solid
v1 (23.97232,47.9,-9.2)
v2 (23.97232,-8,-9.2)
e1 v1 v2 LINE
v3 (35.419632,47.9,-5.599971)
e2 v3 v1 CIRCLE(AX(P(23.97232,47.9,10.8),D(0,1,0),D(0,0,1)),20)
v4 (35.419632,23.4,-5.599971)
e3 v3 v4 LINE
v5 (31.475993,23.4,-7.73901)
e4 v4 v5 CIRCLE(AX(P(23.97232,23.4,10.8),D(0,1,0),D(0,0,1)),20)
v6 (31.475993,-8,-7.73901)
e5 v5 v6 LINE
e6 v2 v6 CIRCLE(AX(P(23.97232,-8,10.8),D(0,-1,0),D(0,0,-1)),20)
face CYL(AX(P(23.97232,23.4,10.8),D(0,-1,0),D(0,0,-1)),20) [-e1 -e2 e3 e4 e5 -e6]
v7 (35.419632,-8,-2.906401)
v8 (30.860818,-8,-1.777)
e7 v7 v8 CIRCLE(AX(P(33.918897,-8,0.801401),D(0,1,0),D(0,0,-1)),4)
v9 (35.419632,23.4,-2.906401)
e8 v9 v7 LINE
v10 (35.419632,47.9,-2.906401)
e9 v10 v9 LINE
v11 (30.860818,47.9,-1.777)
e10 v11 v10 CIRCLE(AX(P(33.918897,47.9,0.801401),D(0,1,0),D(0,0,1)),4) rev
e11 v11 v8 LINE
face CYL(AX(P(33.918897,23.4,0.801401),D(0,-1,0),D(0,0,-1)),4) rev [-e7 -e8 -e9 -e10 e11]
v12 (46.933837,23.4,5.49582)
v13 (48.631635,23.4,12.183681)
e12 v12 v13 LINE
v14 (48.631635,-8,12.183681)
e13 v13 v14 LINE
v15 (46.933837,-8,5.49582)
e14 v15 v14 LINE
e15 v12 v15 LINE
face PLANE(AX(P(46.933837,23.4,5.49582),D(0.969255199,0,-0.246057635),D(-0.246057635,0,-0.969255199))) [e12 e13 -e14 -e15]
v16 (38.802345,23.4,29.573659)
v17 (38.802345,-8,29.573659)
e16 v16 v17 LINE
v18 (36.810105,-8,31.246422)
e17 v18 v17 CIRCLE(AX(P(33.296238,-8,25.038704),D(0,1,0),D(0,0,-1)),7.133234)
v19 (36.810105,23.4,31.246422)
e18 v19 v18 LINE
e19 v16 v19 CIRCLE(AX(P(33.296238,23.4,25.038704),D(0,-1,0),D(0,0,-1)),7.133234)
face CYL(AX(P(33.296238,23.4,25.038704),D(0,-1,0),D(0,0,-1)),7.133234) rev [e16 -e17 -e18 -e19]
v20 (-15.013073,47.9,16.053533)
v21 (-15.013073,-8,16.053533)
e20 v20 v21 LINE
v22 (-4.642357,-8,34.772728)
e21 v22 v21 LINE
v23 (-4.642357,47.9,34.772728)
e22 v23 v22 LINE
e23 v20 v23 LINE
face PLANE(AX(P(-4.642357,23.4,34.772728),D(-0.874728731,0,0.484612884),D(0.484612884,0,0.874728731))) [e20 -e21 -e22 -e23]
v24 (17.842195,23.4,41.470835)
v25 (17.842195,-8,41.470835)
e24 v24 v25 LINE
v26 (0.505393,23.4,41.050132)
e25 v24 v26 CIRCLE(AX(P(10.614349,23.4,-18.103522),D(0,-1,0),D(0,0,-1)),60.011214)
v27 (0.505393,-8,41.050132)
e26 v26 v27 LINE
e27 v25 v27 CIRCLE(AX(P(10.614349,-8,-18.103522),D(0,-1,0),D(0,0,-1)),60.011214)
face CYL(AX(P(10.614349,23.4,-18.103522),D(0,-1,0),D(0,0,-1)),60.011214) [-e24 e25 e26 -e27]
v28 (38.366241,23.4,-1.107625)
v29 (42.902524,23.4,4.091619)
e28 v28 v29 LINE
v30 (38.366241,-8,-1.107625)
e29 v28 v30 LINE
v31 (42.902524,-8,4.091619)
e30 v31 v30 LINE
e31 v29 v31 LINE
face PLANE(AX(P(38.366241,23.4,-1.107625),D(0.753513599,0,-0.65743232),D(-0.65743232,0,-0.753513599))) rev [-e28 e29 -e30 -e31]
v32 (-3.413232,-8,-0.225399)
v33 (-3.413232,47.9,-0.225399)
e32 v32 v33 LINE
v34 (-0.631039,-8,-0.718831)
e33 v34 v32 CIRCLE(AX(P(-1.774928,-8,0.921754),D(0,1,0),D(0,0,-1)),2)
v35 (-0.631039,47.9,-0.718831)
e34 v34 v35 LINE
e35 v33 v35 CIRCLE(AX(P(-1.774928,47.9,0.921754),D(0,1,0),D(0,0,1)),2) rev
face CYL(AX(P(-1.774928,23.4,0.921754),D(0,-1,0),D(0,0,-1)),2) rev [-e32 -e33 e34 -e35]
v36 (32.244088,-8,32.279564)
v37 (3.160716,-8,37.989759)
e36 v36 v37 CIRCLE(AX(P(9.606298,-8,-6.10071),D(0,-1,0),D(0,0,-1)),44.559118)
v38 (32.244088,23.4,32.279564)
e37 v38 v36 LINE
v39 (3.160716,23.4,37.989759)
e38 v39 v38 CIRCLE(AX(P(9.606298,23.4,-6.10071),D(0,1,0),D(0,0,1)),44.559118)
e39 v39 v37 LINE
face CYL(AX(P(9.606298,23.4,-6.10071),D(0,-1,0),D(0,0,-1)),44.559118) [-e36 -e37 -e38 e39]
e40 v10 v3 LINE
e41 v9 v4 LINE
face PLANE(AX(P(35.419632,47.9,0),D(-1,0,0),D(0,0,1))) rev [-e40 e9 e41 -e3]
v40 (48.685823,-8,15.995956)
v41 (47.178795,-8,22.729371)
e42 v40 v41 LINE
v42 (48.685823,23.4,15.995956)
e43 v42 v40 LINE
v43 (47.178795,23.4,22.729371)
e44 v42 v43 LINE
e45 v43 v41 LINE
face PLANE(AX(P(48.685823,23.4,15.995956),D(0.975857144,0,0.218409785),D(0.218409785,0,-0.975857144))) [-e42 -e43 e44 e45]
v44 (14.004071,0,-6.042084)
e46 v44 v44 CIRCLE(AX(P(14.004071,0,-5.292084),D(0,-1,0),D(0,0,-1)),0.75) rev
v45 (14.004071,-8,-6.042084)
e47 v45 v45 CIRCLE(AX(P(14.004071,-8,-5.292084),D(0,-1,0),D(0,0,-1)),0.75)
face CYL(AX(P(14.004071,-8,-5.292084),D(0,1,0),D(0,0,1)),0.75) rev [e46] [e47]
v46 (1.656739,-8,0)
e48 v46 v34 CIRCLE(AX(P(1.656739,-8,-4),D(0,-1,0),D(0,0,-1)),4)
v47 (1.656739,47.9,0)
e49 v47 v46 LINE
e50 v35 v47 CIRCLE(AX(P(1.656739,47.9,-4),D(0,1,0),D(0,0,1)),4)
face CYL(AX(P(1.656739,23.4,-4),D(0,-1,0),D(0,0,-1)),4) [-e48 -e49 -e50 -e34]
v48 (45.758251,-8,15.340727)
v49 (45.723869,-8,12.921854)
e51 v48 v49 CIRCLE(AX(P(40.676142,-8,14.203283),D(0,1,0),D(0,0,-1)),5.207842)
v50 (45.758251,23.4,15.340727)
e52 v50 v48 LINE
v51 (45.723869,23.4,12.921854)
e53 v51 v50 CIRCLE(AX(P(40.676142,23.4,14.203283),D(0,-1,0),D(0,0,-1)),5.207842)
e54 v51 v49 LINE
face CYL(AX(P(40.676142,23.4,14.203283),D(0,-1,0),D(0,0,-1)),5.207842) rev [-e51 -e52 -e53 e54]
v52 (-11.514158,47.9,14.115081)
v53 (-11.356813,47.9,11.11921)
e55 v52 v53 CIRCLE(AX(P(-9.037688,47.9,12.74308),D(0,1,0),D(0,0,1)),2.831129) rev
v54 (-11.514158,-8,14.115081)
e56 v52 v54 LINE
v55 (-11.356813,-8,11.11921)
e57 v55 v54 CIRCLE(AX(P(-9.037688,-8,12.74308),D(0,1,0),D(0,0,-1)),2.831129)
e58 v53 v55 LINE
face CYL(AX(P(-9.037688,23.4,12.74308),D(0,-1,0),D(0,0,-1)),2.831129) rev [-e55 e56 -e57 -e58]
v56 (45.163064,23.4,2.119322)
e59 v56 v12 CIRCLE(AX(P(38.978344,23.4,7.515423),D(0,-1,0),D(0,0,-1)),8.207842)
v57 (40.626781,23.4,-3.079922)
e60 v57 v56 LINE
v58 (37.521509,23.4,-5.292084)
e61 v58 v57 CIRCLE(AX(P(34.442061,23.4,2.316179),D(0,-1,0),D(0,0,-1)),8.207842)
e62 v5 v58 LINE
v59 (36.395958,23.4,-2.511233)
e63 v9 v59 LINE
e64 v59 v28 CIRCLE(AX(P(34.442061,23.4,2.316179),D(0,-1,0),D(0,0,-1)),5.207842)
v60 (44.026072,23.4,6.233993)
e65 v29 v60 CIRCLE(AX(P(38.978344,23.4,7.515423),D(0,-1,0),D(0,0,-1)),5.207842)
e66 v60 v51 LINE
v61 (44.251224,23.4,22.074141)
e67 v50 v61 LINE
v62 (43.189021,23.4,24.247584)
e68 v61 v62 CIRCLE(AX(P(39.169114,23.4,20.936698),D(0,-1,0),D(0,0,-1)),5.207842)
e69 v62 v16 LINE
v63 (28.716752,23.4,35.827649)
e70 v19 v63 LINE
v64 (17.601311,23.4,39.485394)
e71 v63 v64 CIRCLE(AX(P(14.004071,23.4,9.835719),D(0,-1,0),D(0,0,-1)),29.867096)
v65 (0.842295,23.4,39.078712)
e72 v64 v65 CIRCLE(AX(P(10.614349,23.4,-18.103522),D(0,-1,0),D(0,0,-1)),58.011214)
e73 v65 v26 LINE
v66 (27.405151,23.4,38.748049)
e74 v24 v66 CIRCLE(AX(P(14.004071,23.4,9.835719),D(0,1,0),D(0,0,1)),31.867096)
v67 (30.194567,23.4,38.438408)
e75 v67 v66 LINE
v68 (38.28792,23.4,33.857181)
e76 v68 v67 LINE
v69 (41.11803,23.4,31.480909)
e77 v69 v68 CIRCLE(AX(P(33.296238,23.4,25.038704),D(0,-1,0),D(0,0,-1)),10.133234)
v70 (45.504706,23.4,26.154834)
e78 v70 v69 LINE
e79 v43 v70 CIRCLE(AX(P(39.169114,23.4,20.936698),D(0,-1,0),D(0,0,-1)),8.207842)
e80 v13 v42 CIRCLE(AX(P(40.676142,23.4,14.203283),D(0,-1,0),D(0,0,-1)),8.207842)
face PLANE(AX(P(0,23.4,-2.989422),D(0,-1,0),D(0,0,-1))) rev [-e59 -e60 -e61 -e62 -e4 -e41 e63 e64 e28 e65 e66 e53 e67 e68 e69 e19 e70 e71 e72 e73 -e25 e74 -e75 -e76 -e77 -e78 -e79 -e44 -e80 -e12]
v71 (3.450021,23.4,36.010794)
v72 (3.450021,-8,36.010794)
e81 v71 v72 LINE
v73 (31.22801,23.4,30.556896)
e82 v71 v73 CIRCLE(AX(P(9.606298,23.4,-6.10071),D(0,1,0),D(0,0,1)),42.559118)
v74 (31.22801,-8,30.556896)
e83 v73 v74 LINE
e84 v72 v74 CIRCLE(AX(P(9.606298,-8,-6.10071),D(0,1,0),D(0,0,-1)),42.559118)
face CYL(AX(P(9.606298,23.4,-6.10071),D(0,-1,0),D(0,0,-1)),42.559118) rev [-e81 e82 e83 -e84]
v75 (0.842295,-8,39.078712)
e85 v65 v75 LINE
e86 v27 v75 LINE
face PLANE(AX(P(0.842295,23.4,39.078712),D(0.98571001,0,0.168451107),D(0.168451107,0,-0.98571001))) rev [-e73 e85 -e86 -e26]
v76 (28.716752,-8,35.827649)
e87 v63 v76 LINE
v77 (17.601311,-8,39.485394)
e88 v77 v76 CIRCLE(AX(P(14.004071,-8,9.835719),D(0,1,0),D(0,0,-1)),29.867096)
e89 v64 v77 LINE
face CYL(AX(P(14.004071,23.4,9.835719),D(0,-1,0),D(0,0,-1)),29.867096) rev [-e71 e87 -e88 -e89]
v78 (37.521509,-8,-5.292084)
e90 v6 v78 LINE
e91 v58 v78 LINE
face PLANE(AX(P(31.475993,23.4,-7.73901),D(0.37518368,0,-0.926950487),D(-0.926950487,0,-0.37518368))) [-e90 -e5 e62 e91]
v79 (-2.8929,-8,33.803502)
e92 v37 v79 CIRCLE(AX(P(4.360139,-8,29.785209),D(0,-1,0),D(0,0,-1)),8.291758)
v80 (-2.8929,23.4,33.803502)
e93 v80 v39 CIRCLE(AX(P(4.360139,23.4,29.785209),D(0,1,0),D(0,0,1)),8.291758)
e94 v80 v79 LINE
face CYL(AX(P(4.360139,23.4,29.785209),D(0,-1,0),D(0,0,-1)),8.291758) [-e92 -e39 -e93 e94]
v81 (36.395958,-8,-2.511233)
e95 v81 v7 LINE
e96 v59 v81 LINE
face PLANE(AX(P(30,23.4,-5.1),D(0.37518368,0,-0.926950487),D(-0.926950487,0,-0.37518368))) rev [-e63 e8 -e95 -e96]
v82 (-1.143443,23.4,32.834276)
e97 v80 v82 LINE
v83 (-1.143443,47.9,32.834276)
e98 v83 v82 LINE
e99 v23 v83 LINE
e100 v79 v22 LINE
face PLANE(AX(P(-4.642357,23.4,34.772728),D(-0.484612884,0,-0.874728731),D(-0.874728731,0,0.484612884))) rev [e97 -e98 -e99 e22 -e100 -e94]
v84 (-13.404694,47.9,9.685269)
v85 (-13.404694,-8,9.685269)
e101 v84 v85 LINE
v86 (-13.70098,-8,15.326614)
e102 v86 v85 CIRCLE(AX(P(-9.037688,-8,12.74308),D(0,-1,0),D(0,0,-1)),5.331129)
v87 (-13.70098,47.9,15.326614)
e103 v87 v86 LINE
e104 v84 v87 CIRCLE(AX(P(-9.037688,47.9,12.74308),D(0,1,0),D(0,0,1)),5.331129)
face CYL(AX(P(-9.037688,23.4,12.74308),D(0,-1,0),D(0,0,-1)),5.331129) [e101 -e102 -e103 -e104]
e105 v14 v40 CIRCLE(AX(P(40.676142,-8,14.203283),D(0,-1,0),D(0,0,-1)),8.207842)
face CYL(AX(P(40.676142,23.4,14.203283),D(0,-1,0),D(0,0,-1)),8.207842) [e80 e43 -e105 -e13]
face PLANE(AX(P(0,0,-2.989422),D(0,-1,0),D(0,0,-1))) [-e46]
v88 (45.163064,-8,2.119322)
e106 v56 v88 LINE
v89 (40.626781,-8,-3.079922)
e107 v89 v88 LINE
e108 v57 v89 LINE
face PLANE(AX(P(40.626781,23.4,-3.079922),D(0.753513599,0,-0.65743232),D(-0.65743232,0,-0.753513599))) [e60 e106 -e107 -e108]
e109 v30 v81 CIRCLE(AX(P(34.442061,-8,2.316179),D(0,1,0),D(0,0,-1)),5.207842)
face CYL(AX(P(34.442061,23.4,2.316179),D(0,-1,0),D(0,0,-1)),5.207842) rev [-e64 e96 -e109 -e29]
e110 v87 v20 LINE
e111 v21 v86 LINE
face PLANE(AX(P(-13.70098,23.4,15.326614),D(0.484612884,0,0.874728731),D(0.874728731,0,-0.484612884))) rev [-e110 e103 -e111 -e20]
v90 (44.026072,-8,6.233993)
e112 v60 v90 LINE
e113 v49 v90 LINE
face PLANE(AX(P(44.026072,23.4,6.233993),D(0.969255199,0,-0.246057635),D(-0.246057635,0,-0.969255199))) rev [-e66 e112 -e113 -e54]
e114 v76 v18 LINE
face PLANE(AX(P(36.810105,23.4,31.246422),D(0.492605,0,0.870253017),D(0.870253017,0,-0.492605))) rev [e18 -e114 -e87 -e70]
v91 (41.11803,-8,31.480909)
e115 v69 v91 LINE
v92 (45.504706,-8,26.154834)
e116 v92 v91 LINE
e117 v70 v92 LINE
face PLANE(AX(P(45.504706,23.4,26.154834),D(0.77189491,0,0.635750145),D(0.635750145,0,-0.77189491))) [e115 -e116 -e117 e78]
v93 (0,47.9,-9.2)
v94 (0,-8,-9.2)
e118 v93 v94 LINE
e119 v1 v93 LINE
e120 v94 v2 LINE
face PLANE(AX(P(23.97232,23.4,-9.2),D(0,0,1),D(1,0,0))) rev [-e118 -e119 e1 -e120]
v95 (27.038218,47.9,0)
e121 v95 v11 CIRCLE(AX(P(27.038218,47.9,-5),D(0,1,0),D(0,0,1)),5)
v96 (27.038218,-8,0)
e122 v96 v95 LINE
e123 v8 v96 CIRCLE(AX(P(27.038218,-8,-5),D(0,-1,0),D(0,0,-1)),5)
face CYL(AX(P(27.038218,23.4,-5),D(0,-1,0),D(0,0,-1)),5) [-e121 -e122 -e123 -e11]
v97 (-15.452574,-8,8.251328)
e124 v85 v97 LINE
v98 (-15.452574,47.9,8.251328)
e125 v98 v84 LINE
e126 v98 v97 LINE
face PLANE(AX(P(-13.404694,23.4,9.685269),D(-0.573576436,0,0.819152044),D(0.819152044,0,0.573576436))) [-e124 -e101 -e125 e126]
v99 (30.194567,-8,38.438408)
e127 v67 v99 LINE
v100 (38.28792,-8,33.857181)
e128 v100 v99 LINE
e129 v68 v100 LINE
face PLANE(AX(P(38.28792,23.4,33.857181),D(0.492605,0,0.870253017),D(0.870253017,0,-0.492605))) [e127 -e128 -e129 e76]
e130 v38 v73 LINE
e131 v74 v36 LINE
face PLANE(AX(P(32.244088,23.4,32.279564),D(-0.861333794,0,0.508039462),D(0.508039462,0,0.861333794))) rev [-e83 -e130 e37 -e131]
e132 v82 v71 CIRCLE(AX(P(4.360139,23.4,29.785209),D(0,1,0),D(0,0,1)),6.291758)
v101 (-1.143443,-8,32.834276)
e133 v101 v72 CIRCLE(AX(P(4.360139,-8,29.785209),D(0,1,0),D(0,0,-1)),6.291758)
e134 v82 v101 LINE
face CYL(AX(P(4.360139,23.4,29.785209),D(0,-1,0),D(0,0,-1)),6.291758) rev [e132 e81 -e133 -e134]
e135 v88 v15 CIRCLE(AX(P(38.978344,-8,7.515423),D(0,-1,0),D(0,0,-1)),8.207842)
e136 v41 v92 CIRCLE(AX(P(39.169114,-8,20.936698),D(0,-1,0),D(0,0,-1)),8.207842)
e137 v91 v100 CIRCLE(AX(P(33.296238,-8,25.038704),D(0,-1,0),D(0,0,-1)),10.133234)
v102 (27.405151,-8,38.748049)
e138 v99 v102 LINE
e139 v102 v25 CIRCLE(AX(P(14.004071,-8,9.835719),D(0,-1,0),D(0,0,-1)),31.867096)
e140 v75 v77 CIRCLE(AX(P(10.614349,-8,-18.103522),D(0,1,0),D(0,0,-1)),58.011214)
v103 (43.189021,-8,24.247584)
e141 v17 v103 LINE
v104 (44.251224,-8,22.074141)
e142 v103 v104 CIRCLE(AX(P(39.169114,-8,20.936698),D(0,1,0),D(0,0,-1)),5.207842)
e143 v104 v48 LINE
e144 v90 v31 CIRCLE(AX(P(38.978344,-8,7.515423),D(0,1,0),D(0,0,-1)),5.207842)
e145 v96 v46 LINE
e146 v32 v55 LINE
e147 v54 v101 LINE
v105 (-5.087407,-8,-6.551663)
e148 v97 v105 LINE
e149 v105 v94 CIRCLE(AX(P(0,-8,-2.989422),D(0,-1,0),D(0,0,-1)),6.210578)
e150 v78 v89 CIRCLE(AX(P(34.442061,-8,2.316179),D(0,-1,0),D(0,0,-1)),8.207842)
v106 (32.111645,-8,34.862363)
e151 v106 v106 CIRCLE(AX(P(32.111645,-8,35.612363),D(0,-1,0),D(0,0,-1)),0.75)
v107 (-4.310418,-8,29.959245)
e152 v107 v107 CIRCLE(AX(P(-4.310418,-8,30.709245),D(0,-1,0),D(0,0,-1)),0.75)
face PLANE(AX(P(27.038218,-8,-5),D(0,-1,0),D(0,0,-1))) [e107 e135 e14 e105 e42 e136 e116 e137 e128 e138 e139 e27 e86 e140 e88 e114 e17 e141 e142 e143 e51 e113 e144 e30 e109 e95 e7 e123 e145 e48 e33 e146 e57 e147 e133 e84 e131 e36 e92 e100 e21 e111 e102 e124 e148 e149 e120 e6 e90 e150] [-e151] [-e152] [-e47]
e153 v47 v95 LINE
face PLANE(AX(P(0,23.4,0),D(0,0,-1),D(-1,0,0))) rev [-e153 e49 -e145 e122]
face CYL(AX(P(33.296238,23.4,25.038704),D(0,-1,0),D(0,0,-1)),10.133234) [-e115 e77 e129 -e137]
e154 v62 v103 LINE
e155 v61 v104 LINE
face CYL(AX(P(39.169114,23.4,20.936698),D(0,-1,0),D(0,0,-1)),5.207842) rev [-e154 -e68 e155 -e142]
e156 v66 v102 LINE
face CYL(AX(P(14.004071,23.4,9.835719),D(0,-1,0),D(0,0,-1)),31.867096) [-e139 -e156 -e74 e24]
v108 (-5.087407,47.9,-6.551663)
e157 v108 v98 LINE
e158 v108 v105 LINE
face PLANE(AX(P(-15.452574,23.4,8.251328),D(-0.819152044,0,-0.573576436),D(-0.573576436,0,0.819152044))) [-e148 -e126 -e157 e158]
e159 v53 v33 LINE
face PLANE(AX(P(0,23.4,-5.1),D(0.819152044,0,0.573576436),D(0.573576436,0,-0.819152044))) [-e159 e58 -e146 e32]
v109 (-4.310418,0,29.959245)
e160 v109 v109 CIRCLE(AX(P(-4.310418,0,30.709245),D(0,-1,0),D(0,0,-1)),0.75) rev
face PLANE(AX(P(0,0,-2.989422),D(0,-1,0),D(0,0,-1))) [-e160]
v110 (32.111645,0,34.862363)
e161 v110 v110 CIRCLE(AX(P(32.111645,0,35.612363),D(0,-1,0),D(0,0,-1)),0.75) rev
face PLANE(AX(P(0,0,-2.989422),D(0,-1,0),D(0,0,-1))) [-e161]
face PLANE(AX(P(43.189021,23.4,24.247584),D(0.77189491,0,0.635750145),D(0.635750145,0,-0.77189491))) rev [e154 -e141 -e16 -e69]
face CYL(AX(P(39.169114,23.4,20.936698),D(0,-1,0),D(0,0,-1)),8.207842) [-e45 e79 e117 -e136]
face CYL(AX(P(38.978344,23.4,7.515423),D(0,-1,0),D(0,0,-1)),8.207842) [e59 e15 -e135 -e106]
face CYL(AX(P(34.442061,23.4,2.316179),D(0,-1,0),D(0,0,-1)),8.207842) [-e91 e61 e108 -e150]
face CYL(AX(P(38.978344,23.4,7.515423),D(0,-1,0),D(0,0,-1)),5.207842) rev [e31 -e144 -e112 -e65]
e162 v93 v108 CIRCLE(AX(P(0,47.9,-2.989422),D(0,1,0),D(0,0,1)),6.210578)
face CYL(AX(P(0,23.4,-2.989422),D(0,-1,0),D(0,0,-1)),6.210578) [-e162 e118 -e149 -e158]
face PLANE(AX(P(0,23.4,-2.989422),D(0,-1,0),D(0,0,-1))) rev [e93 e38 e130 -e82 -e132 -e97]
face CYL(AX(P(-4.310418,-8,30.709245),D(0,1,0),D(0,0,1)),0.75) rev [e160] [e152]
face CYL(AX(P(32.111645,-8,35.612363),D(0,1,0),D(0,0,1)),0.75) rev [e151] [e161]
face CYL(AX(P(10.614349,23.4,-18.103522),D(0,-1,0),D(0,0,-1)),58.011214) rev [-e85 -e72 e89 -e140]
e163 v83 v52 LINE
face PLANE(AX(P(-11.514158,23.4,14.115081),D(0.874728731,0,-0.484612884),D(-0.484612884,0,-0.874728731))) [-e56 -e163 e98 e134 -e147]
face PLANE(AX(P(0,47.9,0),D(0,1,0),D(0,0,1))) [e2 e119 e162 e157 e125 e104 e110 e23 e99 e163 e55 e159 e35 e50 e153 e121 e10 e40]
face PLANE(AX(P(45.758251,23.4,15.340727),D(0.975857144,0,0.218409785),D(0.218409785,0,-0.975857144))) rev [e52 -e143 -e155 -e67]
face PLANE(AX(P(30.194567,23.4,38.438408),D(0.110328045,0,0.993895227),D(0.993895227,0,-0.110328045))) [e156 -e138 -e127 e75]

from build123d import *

# Parameters (mm, degrees)
BOSS_EXTRUDE1_DEPTH = 23.4
FILLET1_R           = 4
FILLET3_R           = 2
FILLET4_R           = 4
FILLET5_R           = 5
BOSS_EXTRUDE2_DEPTH = 24.5
BOSS_EXTRUDE3_START = 8
SKETCH3_R           = 0.75
BOSS_EXTRUDE3_DEPTH = 8


with BuildPart() as part:
    # Sketch1 → Boss-Extrude1 (new body)
    with BuildSketch(Plane(origin=(0, 0, 0), x_dir=(1, 0, 0), z_dir=(0, 1, 0))):
        with BuildLine():
            Line((0, 0), (30, 0))
            Line((30, 0), (30, 5.1))
            Line((30, 5.1), (36.395958363, 2.511232605))
            ThreePointArc((36.395958363, 2.511232605), (37.463728778, 1.925417586), (38.366240646, 1.107624688))
            Line((38.366240646, 1.107624688), (42.902523658, -4.091619145))
            ThreePointArc((42.902523658, -4.091619145), (43.590417547, -5.096663868), (44.026071732, -6.233993339))
            Line((44.026071732, -6.233993339), (45.723869414, -12.921854211))
            ThreePointArc((45.723869414, -12.921854211), (45.883457457, -14.129266548), (45.7582513, -15.340726954))
            Line((45.7582513, -15.340726954), (44.251223786, -22.074141249))
            ThreePointArc((44.251223786, -22.074141249), (43.848071102, -23.223393532), (43.189020782, -24.247583736))
            Line((43.189020782, -24.247583736), (38.802344779, -29.573658617))
            ThreePointArc((38.802344779, -29.573658617), (37.883123065, -30.501625481), (36.810104599, -31.246422387))
            Line((36.810104599, -31.246422387), (28.716751538, -35.827648886))
            ThreePointArc((28.716751538, -35.827648886), (23.339920043, -38.206219709), (17.601311476, -39.485394366))
            ThreePointArc((17.601311476, -39.485394366), (9.20703571, -39.890619172), (0.842295428, -39.078712278))
            Line((0.842295428, -39.078712278), (0.505393215, -41.050132299))
            ThreePointArc((0.505393215, -41.050132299), (9.158517062, -41.89003057), (17.842194661, -41.470835196))
            ThreePointArc((17.842194661, -41.470835196), (22.730520814, -40.484713163), (27.40515094, -38.748048996))
            Line((27.40515094, -38.748048996), (30.194566538, -38.438407937))
            Line((30.194566538, -38.438407937), (38.287919599, -33.857181439))
            ThreePointArc((38.287919599, -33.857181439), (39.812213821, -32.79914781), (41.11802951, -31.480909053))
            Line((41.11802951, -31.480909053), (45.504705513, -26.154834172))
            ThreePointArc((45.504705513, -26.154834172), (46.543404661, -24.540654707), (47.178795219, -22.729370603))
            Line((47.178795219, -22.729370603), (48.685822733, -15.995956308))
            ThreePointArc((48.685822733, -15.995956308), (48.883154446, -14.086628819), (48.63163501, -12.183681305))
            Line((48.63163501, -12.183681305), (46.933837328, -5.495820434))
            ThreePointArc((46.933837328, -5.495820434), (46.247222637, -3.703327329), (45.163064455, -2.119322184))
            Line((45.163064455, -2.119322184), (40.626781443, 3.07992165))
            ThreePointArc((40.626781443, 3.07992165), (39.204373652, 4.368807735), (37.521509404, 5.292084068))
            Line((37.521509404, 5.292084068), (31.475993381, 7.739009747))
            ThreePointArc((31.475993381, 7.739009747), (27.794609995, 8.831354958), (23.972319774, 9.2))
            Line((23.972319774, 9.2), (0, 9.2))
            ThreePointArc((0, 9.2), (-2.867725571, 8.498272017), (-5.087407296, 6.551663389))
            Line((-5.087407296, 6.551663389), (-15.452573661, -8.251328295))
            Line((-15.452573661, -8.251328295), (-13.40469355, -9.685269386))
            ThreePointArc((-13.40469355, -9.685269386), (-14.36147987, -12.463471121), (-13.70098006, -15.326613615))
            Line((-13.70098006, -15.326613615), (-15.013073156, -16.053532941))
            Line((-15.013073156, -16.053532941), (-4.642357438, -34.772727782))
            Line((-4.642357438, -34.772727782), (-2.892899976, -33.803502014))
            ThreePointArc((-2.892899976, -33.803502014), (-0.356026186, -36.605109272), (3.160716272, -37.98975881))
            ThreePointArc((3.160716272, -37.98975881), (18.191080341, -37.623613679), (32.244088475, -32.279563836))
            Line((32.244088475, -32.279563836), (31.228009552, -30.556896247))
            ThreePointArc((31.228009552, -30.556896247), (17.805759331, -35.661082732), (3.450021006, -36.010793734))
            ThreePointArc((3.450021006, -36.010793734), (0.781528732, -34.960126351), (-1.143442514, -32.834276246))
            Line((-1.143442514, -32.834276246), (-11.514158233, -14.115081405))
            ThreePointArc((-11.514158233, -14.115081405), (-11.864920764, -12.594591782), (-11.35681344, -11.119210477))
            Line((-11.35681344, -11.119210477), (0, 5.1))
            Line((0, 5.1), (0, 0))
        make_face()
    extrude(amount=BOSS_EXTRUDE1_DEPTH)

    # Fillet1
    # the kernel refuses this fillet: 4 mm, written as the material it adds along each edge
    with BuildSketch(Plane(origin=(30, 0, -5.1), x_dir=(0, 0, 1), z_dir=(0, 1, 0))) as fillet1_piece_1:
        with BuildLine():
            CenterArc((5.901400798, 3.918897391), FILLET1_R, 157.964334143, 100.478227364)
            Line((2.193598849, 5.419632112), (2.11944281, 5.449646807))
            Line((2.11944281, 5.449646807), (-0.074156039, 0.030014694))
            Line((-0.074156039, 0.030014694), (0, -0.08))
            ThreePointArc((0, -0.08), (2.55, -0.08), (5.083971984, -0.078377948))
            Line((5.083971984, -0.078377948), (5.1, 0))
        make_face()
    extrude(amount=23.4)

    # Fillet3
    # the kernel refuses this fillet: 2 mm, written as the material it adds along each edge
    with BuildSketch(Plane(origin=(0, 0, -5.1), x_dir=(0, 0, 1), z_dir=(0, 1, 0))) as fillet3_piece_1:
        with BuildLine():
            CenterArc((6.021753736, -1.774928182), FILLET3_R, 117.443704679, 117.556295321)
            Line((4.874600863, -3.41323227), (4.851657806, -3.445998352))
            Line((4.851657806, -3.445998352), (-0.022943057, -0.032766082))
            Line((-0.022943057, -0.032766082), (0, 0.04))
            ThreePointArc((0, 0.04), (2.55, 0.04), (5.081564925, 0.035498564))
            Line((5.081564925, 0.035498564), (5.1, 0))
        make_face()
    extrude(amount=23.4)

    # Fillet4
    fillet4_edges = [part.edges().sort_by_distance(p)[0] for p in [
        (0, 11.7, 0),
    ]]
    fillet(fillet4_edges, radius=FILLET4_R)

    # Fillet5
    fillet5_edges = [part.edges().sort_by_distance(p)[0] for p in [
        (30, 11.7, 0),
    ]]
    fillet(fillet5_edges, radius=FILLET5_R)

    # Sketch2 → Boss-Extrude2 (add)
    with BuildSketch(Plane(origin=(0, 23.4, 0), x_dir=(1, 0, 0), z_dir=(0, 1, 0))):
        with BuildLine():
            Line((-4.642357438, -34.772727782), (-2.892899976, -33.803502014))
            Line((-2.892899976, -33.803502014), (-1.143442514, -32.834276246))
            Line((-1.143442514, -32.834276246), (-11.514158233, -14.115081405))
            ThreePointArc((-11.514158233, -14.115081405), (-11.864920764, -12.594591782), (-11.35681344, -11.119210477))
            Line((-11.35681344, -11.119210477), (-3.41323227, 0.225399137))
            ThreePointArc((-3.41323227, 0.225399137), (-2.124184908, 1.047515098), (-0.631039096, 0.718830843))
            ThreePointArc((-0.631039096, 0.718830843), (0.457713769, 0.183936804), (1.656739075, 0))
            Line((1.656739075, 0), (27.038218008, 0))
            ThreePointArc((27.038218008, 0), (29.145941635, 0.465961942), (30.860817665, 1.776999556))
            ThreePointArc((30.860817665, 1.776999556), (32.957014936, 3.081224878), (35.419632112, 2.906401151))
            Line((35.419632112, 2.906401151), (35.419632112, 5.599970739))
            ThreePointArc((35.419632112, 5.599970739), (33.507981211, 6.780419817), (31.475993381, 7.739009747))
            ThreePointArc((31.475993381, 7.739009747), (27.794609995, 8.831354958), (23.972319774, 9.2))
            Line((23.972319774, 9.2), (0, 9.2))
            ThreePointArc((0, 9.2), (-2.867725571, 8.498272017), (-5.087407296, 6.551663389))
            Line((-5.087407296, 6.551663389), (-15.452573661, -8.251328295))
            Line((-15.452573661, -8.251328295), (-13.40469355, -9.685269386))
            ThreePointArc((-13.40469355, -9.685269386), (-14.36147987, -12.463471121), (-13.70098006, -15.326613615))
            Line((-13.70098006, -15.326613615), (-15.013073156, -16.053532941))
            Line((-15.013073156, -16.053532941), (-4.642357438, -34.772727782))
        make_face()
    extrude(amount=BOSS_EXTRUDE2_DEPTH)

    # Sketch3 → Boss-Extrude3 (add)
    with BuildSketch(Plane.XZ.offset(BOSS_EXTRUDE3_START)):
        with BuildLine():
            Line((27.038218008, 0), (1.656739075, 0))
            ThreePointArc((1.656739075, 0), (0.457713769, -0.183936804), (-0.631039096, -0.718830843))
            ThreePointArc((-0.631039096, -0.718830843), (-2.124184908, -1.047515098), (-3.41323227, -0.225399137))
            Line((-3.41323227, -0.225399137), (-11.35681344, 11.119210477))
            ThreePointArc((-11.35681344, 11.119210477), (-11.864920764, 12.594591782), (-11.514158233, 14.115081405))
            Line((-11.514158233, 14.115081405), (-1.143442514, 32.834276246))
            ThreePointArc((-1.143442514, 32.834276246), (0.781528732, 34.960126351), (3.450021006, 36.010793734))
            ThreePointArc((3.450021006, 36.010793734), (17.805759331, 35.661082732), (31.228009552, 30.556896247))
            Line((31.228009552, 30.556896247), (32.244088475, 32.279563836))
            ThreePointArc((32.244088475, 32.279563836), (18.191080341, 37.623613679), (3.160716272, 37.98975881))
            ThreePointArc((3.160716272, 37.98975881), (-0.356026186, 36.605109272), (-2.892899976, 33.803502014))
            Line((-2.892899976, 33.803502014), (-4.642357438, 34.772727782))
            Line((-4.642357438, 34.772727782), (-15.013073156, 16.053532941))
            Line((-15.013073156, 16.053532941), (-13.70098006, 15.326613615))
            ThreePointArc((-13.70098006, 15.326613615), (-14.36147987, 12.463471121), (-13.40469355, 9.685269386))
            Line((-13.40469355, 9.685269386), (-15.452573661, 8.251328295))
            Line((-15.452573661, 8.251328295), (-5.087407296, -6.551663389))
            ThreePointArc((-5.087407296, -6.551663389), (-2.867725571, -8.498272017), (0, -9.2))
            Line((0, -9.2), (23.972319774, -9.2))
            ThreePointArc((23.972319774, -9.2), (27.794609995, -8.831354958), (31.475993381, -7.739009747))
            Line((31.475993381, -7.739009747), (37.521509404, -5.292084068))
            ThreePointArc((37.521509404, -5.292084068), (39.204373652, -4.368807735), (40.626781443, -3.07992165))
            Line((40.626781443, -3.07992165), (45.163064455, 2.119322184))
            ThreePointArc((45.163064455, 2.119322184), (46.247222637, 3.703327329), (46.933837328, 5.495820434))
            Line((46.933837328, 5.495820434), (48.63163501, 12.183681305))
            ThreePointArc((48.63163501, 12.183681305), (48.883154446, 14.086628819), (48.685822733, 15.995956308))
            Line((48.685822733, 15.995956308), (47.178795219, 22.729370603))
            ThreePointArc((47.178795219, 22.729370603), (46.543404661, 24.540654707), (45.504705513, 26.154834172))
            Line((45.504705513, 26.154834172), (41.11802951, 31.480909053))
            ThreePointArc((41.11802951, 31.480909053), (39.812213821, 32.79914781), (38.287919599, 33.857181439))
            Line((38.287919599, 33.857181439), (30.194566538, 38.438407937))
            Line((30.194566538, 38.438407937), (27.40515094, 38.748048996))
            ThreePointArc((27.40515094, 38.748048996), (22.730520814, 40.484713163), (17.842194661, 41.470835196))
            ThreePointArc((17.842194661, 41.470835196), (9.158517062, 41.89003057), (0.505393215, 41.050132299))
            Line((0.505393215, 41.050132299), (0.842295428, 39.078712278))
            ThreePointArc((0.842295428, 39.078712278), (9.20703571, 39.890619172), (17.601311476, 39.485394366))
            ThreePointArc((17.601311476, 39.485394366), (23.339920043, 38.206219709), (28.716751538, 35.827648886))
            Line((28.716751538, 35.827648886), (36.810104599, 31.246422387))
            ThreePointArc((36.810104599, 31.246422387), (37.883123065, 30.501625481), (38.802344779, 29.573658617))
            Line((38.802344779, 29.573658617), (43.189020782, 24.247583736))
            ThreePointArc((43.189020782, 24.247583736), (43.848071102, 23.223393532), (44.251223786, 22.074141249))
            Line((44.251223786, 22.074141249), (45.7582513, 15.340726954))
            ThreePointArc((45.7582513, 15.340726954), (45.883457457, 14.129266548), (45.723869414, 12.921854211))
            Line((45.723869414, 12.921854211), (44.026071732, 6.233993339))
            ThreePointArc((44.026071732, 6.233993339), (43.590417547, 5.096663868), (42.902523658, 4.091619145))
            Line((42.902523658, 4.091619145), (38.366240646, -1.107624688))
            ThreePointArc((38.366240646, -1.107624688), (37.463728778, -1.925417586), (36.395958363, -2.511232605))
            Line((36.395958363, -2.511232605), (35.419632112, -2.906401151))
            ThreePointArc((35.419632112, -2.906401151), (32.957014936, -3.081224878), (30.860817665, -1.776999556))
            ThreePointArc((30.860817665, -1.776999556), (29.145941635, -0.465961942), (27.038218008, 0))
        make_face()
        with Locations(Location((-4.310418078, 30.709245073, 0), (0, 0, 270))):
            Circle(SKETCH3_R, mode=Mode.SUBTRACT)
        with Locations(Location((32.111644804, 35.612363227, 0), (0, 0, 270))):
            Circle(SKETCH3_R, mode=Mode.SUBTRACT)
        with Locations(Location((14.004070921, -5.292084068, 0), (0, 0, 270))):
            Circle(SKETCH3_R, mode=Mode.SUBTRACT)
    extrude(amount=-BOSS_EXTRUDE3_DEPTH)


solid = part.part
